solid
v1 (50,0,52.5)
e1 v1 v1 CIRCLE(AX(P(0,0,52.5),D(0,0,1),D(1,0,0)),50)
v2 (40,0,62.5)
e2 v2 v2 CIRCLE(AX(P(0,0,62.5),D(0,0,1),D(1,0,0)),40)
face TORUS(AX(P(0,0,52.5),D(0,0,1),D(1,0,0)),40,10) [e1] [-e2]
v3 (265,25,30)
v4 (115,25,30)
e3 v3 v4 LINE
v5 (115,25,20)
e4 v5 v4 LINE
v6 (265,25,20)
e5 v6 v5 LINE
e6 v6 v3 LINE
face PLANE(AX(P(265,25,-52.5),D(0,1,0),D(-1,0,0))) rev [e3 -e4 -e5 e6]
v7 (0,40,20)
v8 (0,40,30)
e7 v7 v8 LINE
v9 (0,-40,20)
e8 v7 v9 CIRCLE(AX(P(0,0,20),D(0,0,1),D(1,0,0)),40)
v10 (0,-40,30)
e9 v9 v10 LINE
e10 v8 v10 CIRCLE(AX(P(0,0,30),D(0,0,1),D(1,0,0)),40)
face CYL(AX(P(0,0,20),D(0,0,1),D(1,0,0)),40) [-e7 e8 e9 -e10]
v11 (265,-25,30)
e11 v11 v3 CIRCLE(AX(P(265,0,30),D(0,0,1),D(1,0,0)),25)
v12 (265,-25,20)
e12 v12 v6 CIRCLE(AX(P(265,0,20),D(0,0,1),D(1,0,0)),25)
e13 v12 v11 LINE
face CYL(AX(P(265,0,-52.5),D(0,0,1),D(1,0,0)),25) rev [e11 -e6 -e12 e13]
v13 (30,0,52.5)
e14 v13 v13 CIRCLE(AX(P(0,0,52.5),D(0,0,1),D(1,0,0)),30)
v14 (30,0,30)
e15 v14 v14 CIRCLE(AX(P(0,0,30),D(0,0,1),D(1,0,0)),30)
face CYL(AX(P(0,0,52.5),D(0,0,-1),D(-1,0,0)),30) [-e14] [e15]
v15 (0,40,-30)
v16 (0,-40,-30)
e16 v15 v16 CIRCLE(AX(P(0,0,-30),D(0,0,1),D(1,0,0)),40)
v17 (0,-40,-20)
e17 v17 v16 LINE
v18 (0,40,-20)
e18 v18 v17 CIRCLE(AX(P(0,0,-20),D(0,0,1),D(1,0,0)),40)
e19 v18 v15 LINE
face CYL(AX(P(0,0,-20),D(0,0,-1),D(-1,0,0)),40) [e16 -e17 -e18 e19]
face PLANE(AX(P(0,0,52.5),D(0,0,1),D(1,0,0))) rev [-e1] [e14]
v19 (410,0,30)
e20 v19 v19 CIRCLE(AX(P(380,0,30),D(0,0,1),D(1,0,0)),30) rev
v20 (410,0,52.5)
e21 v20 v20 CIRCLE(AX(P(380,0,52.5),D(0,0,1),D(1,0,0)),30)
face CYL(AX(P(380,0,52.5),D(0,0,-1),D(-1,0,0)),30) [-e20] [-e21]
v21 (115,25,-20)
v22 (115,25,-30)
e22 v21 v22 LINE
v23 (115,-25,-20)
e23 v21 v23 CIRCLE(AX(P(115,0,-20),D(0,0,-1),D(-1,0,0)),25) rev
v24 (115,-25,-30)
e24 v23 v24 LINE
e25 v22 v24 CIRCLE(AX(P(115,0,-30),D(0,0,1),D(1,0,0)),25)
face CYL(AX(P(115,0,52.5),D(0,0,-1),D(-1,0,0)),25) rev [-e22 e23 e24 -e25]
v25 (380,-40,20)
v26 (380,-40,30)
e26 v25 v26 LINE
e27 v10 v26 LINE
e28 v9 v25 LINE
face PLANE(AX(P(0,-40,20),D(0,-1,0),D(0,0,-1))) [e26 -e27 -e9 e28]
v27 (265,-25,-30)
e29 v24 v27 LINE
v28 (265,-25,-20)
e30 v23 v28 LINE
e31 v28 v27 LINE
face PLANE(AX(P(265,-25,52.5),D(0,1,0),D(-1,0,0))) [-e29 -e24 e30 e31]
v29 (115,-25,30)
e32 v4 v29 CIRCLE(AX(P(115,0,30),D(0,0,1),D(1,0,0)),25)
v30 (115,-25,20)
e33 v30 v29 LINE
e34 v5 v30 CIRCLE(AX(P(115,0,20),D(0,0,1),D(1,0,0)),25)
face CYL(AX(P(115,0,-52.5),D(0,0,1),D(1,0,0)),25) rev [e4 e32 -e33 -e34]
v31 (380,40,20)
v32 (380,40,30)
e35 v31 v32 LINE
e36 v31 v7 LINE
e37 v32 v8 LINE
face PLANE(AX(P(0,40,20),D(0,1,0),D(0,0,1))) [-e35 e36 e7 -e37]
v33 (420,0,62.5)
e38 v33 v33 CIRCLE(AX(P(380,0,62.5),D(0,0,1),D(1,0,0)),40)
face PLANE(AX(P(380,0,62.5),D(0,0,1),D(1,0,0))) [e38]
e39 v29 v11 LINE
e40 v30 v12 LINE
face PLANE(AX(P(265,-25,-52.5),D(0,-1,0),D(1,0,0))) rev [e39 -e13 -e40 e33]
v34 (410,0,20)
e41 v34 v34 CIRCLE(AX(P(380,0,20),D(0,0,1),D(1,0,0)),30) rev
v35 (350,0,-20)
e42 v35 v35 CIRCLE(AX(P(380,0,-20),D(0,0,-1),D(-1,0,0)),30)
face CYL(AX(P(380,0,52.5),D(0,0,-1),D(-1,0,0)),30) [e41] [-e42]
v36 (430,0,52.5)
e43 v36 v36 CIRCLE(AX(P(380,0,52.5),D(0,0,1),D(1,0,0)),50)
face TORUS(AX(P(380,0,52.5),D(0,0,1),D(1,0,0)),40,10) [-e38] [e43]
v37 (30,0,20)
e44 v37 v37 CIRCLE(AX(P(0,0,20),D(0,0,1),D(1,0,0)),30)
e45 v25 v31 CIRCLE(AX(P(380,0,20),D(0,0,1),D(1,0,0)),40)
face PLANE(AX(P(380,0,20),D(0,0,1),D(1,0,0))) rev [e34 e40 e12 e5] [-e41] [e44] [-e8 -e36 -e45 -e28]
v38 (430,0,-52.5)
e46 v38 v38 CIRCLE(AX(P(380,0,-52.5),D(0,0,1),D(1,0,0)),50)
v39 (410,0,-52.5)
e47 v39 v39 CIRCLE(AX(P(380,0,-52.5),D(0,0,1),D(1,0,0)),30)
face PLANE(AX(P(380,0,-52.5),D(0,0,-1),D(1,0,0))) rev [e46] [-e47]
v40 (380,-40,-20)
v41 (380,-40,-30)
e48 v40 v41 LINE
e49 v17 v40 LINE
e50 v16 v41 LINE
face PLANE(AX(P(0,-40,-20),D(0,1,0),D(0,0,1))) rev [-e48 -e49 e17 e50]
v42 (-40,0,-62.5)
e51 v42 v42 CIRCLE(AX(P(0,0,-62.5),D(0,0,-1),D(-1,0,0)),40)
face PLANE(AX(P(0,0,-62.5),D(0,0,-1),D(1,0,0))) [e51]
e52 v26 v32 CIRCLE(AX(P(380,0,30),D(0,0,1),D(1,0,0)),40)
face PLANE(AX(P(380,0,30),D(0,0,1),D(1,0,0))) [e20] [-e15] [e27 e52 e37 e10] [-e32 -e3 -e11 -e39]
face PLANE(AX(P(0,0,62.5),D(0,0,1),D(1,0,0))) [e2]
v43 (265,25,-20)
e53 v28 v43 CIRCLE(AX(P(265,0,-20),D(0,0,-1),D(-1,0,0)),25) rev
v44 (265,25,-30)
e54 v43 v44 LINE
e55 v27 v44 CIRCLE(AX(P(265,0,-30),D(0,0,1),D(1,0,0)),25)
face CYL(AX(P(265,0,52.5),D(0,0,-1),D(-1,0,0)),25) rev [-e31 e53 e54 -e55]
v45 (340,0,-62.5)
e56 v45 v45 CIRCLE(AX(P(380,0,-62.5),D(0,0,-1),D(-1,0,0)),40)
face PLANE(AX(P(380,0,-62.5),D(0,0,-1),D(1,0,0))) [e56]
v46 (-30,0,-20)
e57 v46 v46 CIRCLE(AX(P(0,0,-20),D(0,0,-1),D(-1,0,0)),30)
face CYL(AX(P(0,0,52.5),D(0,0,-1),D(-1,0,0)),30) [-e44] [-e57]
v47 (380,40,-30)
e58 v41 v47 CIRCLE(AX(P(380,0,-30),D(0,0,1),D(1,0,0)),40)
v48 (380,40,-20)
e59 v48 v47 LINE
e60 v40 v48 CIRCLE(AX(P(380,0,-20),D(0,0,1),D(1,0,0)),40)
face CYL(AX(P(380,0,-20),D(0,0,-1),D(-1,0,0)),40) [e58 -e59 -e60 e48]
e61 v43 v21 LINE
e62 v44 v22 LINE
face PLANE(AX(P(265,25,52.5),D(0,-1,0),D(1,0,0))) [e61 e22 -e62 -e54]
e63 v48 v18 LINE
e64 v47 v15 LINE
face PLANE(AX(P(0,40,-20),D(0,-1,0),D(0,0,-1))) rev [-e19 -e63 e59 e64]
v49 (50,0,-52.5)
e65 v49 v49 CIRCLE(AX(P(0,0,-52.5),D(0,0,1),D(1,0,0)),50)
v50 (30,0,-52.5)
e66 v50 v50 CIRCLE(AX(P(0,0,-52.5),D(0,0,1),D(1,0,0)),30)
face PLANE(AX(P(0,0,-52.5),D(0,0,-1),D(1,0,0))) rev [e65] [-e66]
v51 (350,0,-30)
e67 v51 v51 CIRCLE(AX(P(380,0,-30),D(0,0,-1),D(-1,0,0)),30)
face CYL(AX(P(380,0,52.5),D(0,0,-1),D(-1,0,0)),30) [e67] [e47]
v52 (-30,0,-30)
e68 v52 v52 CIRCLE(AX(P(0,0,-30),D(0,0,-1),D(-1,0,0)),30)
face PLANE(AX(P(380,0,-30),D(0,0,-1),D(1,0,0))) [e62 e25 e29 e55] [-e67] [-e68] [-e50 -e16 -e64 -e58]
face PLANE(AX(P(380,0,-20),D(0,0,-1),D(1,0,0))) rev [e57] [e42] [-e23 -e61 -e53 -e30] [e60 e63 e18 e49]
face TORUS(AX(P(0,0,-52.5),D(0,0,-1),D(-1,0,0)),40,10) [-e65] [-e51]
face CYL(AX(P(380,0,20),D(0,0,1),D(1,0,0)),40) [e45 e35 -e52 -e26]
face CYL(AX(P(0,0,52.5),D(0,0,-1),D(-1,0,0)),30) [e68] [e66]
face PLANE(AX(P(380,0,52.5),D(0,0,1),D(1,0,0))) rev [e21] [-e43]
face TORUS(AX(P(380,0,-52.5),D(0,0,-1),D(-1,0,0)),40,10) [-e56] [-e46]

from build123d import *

# Parameters (mm, degrees)
SKETCH2_R            = 30
BOSS_EXTRUDE1_DEPTH  = 52.5
BOSS_EXTRUDE2_DEPTH  = 10
CUT_EXTRUDE1_DEPTH   = 430.890974551
SKETCH5_R            = 30
BOSS_EXTRUDE3_DEPTH  = 52.5
SKETCH6_R            = 50
BOSS_EXTRUDE4_DEPTH  = 10
FILLET1_R            = 10
FILLET1_OF_MIRROR3_R = 10


with BuildPart() as part:
    # Sketch2 → Boss-Extrude1 (new, symmetric)
    with BuildSketch(Plane.XY):
        Circle(SKETCH2_R)
    extrude(amount=BOSS_EXTRUDE1_DEPTH, both=True)

    # Sketch3 → Boss-Extrude2 (add)
    with BuildSketch(Plane.XY.offset(30)):
        with BuildLine():
            Line((0, 40), (380, 40))
            ThreePointArc((380, 40), (420, 0), (380, -40))
            Line((380, -40), (0, -40))
            ThreePointArc((0, -40), (-40, 0), (0, 40))
        make_face()
    boss_extrude2 = extrude(amount=-BOSS_EXTRUDE2_DEPTH)

    # Sketch4 → Cut-Extrude1 (cut, through all)
    with BuildSketch(Plane.XY.offset(30)):
        with BuildLine():
            Line((265, -25), (115, -25))
            ThreePointArc((115, -25), (90, 0), (115, 25))
            Line((115, 25), (265, 25))
            ThreePointArc((265, 25), (290, 0), (265, -25))
        make_face()
    cut_extrude1 = extrude(amount=-CUT_EXTRUDE1_DEPTH, mode=Mode.SUBTRACT)

    # Sketch5 → Boss-Extrude3 (add, symmetric)
    with BuildSketch(Plane.XY):
        with Locations((380, 0)):
            Circle(SKETCH5_R)
    extrude(amount=BOSS_EXTRUDE3_DEPTH, both=True)

    # Mirror1: Boss-Extrude2, Cut-Extrude1 across plane
    add(boss_extrude2.mirror(Plane.XY))
    add(cut_extrude1.mirror(Plane.XY), mode=Mode.SUBTRACT)

    # Sketch6 → Boss-Extrude4 (add)
    with BuildSketch(Plane.XY.offset(52.5)):
        Circle(SKETCH6_R)
        with Locations((380, 0)):
            Circle(SKETCH6_R)
    boss_extrude4 = extrude(amount=BOSS_EXTRUDE4_DEPTH)

    # Fillet1
    fillet1_edges = [part.edges().sort_by_distance(p)[0] for p in [
        (-50, 0, 62.5),
        (330, 0, 62.5),
    ]]
    fillet(fillet1_edges, radius=FILLET1_R - 0.0001)  # a hair under: the kernel refuses the full size

    # Mirror3: Boss-Extrude4 across plane
    add(boss_extrude4.mirror(Plane.XY))

    # Fillet1 of Mirror3
    fillet1_of_mirror3_edges = [part.edges().sort_by_distance(p)[0] for p in [
        (-50, 0, -62.5),
        (330, 0, -62.5),
    ]]
    fillet(fillet1_of_mirror3_edges, radius=FILLET1_OF_MIRROR3_R - 0.0001)  # a hair under: the kernel refuses the full size


solid = part.part
